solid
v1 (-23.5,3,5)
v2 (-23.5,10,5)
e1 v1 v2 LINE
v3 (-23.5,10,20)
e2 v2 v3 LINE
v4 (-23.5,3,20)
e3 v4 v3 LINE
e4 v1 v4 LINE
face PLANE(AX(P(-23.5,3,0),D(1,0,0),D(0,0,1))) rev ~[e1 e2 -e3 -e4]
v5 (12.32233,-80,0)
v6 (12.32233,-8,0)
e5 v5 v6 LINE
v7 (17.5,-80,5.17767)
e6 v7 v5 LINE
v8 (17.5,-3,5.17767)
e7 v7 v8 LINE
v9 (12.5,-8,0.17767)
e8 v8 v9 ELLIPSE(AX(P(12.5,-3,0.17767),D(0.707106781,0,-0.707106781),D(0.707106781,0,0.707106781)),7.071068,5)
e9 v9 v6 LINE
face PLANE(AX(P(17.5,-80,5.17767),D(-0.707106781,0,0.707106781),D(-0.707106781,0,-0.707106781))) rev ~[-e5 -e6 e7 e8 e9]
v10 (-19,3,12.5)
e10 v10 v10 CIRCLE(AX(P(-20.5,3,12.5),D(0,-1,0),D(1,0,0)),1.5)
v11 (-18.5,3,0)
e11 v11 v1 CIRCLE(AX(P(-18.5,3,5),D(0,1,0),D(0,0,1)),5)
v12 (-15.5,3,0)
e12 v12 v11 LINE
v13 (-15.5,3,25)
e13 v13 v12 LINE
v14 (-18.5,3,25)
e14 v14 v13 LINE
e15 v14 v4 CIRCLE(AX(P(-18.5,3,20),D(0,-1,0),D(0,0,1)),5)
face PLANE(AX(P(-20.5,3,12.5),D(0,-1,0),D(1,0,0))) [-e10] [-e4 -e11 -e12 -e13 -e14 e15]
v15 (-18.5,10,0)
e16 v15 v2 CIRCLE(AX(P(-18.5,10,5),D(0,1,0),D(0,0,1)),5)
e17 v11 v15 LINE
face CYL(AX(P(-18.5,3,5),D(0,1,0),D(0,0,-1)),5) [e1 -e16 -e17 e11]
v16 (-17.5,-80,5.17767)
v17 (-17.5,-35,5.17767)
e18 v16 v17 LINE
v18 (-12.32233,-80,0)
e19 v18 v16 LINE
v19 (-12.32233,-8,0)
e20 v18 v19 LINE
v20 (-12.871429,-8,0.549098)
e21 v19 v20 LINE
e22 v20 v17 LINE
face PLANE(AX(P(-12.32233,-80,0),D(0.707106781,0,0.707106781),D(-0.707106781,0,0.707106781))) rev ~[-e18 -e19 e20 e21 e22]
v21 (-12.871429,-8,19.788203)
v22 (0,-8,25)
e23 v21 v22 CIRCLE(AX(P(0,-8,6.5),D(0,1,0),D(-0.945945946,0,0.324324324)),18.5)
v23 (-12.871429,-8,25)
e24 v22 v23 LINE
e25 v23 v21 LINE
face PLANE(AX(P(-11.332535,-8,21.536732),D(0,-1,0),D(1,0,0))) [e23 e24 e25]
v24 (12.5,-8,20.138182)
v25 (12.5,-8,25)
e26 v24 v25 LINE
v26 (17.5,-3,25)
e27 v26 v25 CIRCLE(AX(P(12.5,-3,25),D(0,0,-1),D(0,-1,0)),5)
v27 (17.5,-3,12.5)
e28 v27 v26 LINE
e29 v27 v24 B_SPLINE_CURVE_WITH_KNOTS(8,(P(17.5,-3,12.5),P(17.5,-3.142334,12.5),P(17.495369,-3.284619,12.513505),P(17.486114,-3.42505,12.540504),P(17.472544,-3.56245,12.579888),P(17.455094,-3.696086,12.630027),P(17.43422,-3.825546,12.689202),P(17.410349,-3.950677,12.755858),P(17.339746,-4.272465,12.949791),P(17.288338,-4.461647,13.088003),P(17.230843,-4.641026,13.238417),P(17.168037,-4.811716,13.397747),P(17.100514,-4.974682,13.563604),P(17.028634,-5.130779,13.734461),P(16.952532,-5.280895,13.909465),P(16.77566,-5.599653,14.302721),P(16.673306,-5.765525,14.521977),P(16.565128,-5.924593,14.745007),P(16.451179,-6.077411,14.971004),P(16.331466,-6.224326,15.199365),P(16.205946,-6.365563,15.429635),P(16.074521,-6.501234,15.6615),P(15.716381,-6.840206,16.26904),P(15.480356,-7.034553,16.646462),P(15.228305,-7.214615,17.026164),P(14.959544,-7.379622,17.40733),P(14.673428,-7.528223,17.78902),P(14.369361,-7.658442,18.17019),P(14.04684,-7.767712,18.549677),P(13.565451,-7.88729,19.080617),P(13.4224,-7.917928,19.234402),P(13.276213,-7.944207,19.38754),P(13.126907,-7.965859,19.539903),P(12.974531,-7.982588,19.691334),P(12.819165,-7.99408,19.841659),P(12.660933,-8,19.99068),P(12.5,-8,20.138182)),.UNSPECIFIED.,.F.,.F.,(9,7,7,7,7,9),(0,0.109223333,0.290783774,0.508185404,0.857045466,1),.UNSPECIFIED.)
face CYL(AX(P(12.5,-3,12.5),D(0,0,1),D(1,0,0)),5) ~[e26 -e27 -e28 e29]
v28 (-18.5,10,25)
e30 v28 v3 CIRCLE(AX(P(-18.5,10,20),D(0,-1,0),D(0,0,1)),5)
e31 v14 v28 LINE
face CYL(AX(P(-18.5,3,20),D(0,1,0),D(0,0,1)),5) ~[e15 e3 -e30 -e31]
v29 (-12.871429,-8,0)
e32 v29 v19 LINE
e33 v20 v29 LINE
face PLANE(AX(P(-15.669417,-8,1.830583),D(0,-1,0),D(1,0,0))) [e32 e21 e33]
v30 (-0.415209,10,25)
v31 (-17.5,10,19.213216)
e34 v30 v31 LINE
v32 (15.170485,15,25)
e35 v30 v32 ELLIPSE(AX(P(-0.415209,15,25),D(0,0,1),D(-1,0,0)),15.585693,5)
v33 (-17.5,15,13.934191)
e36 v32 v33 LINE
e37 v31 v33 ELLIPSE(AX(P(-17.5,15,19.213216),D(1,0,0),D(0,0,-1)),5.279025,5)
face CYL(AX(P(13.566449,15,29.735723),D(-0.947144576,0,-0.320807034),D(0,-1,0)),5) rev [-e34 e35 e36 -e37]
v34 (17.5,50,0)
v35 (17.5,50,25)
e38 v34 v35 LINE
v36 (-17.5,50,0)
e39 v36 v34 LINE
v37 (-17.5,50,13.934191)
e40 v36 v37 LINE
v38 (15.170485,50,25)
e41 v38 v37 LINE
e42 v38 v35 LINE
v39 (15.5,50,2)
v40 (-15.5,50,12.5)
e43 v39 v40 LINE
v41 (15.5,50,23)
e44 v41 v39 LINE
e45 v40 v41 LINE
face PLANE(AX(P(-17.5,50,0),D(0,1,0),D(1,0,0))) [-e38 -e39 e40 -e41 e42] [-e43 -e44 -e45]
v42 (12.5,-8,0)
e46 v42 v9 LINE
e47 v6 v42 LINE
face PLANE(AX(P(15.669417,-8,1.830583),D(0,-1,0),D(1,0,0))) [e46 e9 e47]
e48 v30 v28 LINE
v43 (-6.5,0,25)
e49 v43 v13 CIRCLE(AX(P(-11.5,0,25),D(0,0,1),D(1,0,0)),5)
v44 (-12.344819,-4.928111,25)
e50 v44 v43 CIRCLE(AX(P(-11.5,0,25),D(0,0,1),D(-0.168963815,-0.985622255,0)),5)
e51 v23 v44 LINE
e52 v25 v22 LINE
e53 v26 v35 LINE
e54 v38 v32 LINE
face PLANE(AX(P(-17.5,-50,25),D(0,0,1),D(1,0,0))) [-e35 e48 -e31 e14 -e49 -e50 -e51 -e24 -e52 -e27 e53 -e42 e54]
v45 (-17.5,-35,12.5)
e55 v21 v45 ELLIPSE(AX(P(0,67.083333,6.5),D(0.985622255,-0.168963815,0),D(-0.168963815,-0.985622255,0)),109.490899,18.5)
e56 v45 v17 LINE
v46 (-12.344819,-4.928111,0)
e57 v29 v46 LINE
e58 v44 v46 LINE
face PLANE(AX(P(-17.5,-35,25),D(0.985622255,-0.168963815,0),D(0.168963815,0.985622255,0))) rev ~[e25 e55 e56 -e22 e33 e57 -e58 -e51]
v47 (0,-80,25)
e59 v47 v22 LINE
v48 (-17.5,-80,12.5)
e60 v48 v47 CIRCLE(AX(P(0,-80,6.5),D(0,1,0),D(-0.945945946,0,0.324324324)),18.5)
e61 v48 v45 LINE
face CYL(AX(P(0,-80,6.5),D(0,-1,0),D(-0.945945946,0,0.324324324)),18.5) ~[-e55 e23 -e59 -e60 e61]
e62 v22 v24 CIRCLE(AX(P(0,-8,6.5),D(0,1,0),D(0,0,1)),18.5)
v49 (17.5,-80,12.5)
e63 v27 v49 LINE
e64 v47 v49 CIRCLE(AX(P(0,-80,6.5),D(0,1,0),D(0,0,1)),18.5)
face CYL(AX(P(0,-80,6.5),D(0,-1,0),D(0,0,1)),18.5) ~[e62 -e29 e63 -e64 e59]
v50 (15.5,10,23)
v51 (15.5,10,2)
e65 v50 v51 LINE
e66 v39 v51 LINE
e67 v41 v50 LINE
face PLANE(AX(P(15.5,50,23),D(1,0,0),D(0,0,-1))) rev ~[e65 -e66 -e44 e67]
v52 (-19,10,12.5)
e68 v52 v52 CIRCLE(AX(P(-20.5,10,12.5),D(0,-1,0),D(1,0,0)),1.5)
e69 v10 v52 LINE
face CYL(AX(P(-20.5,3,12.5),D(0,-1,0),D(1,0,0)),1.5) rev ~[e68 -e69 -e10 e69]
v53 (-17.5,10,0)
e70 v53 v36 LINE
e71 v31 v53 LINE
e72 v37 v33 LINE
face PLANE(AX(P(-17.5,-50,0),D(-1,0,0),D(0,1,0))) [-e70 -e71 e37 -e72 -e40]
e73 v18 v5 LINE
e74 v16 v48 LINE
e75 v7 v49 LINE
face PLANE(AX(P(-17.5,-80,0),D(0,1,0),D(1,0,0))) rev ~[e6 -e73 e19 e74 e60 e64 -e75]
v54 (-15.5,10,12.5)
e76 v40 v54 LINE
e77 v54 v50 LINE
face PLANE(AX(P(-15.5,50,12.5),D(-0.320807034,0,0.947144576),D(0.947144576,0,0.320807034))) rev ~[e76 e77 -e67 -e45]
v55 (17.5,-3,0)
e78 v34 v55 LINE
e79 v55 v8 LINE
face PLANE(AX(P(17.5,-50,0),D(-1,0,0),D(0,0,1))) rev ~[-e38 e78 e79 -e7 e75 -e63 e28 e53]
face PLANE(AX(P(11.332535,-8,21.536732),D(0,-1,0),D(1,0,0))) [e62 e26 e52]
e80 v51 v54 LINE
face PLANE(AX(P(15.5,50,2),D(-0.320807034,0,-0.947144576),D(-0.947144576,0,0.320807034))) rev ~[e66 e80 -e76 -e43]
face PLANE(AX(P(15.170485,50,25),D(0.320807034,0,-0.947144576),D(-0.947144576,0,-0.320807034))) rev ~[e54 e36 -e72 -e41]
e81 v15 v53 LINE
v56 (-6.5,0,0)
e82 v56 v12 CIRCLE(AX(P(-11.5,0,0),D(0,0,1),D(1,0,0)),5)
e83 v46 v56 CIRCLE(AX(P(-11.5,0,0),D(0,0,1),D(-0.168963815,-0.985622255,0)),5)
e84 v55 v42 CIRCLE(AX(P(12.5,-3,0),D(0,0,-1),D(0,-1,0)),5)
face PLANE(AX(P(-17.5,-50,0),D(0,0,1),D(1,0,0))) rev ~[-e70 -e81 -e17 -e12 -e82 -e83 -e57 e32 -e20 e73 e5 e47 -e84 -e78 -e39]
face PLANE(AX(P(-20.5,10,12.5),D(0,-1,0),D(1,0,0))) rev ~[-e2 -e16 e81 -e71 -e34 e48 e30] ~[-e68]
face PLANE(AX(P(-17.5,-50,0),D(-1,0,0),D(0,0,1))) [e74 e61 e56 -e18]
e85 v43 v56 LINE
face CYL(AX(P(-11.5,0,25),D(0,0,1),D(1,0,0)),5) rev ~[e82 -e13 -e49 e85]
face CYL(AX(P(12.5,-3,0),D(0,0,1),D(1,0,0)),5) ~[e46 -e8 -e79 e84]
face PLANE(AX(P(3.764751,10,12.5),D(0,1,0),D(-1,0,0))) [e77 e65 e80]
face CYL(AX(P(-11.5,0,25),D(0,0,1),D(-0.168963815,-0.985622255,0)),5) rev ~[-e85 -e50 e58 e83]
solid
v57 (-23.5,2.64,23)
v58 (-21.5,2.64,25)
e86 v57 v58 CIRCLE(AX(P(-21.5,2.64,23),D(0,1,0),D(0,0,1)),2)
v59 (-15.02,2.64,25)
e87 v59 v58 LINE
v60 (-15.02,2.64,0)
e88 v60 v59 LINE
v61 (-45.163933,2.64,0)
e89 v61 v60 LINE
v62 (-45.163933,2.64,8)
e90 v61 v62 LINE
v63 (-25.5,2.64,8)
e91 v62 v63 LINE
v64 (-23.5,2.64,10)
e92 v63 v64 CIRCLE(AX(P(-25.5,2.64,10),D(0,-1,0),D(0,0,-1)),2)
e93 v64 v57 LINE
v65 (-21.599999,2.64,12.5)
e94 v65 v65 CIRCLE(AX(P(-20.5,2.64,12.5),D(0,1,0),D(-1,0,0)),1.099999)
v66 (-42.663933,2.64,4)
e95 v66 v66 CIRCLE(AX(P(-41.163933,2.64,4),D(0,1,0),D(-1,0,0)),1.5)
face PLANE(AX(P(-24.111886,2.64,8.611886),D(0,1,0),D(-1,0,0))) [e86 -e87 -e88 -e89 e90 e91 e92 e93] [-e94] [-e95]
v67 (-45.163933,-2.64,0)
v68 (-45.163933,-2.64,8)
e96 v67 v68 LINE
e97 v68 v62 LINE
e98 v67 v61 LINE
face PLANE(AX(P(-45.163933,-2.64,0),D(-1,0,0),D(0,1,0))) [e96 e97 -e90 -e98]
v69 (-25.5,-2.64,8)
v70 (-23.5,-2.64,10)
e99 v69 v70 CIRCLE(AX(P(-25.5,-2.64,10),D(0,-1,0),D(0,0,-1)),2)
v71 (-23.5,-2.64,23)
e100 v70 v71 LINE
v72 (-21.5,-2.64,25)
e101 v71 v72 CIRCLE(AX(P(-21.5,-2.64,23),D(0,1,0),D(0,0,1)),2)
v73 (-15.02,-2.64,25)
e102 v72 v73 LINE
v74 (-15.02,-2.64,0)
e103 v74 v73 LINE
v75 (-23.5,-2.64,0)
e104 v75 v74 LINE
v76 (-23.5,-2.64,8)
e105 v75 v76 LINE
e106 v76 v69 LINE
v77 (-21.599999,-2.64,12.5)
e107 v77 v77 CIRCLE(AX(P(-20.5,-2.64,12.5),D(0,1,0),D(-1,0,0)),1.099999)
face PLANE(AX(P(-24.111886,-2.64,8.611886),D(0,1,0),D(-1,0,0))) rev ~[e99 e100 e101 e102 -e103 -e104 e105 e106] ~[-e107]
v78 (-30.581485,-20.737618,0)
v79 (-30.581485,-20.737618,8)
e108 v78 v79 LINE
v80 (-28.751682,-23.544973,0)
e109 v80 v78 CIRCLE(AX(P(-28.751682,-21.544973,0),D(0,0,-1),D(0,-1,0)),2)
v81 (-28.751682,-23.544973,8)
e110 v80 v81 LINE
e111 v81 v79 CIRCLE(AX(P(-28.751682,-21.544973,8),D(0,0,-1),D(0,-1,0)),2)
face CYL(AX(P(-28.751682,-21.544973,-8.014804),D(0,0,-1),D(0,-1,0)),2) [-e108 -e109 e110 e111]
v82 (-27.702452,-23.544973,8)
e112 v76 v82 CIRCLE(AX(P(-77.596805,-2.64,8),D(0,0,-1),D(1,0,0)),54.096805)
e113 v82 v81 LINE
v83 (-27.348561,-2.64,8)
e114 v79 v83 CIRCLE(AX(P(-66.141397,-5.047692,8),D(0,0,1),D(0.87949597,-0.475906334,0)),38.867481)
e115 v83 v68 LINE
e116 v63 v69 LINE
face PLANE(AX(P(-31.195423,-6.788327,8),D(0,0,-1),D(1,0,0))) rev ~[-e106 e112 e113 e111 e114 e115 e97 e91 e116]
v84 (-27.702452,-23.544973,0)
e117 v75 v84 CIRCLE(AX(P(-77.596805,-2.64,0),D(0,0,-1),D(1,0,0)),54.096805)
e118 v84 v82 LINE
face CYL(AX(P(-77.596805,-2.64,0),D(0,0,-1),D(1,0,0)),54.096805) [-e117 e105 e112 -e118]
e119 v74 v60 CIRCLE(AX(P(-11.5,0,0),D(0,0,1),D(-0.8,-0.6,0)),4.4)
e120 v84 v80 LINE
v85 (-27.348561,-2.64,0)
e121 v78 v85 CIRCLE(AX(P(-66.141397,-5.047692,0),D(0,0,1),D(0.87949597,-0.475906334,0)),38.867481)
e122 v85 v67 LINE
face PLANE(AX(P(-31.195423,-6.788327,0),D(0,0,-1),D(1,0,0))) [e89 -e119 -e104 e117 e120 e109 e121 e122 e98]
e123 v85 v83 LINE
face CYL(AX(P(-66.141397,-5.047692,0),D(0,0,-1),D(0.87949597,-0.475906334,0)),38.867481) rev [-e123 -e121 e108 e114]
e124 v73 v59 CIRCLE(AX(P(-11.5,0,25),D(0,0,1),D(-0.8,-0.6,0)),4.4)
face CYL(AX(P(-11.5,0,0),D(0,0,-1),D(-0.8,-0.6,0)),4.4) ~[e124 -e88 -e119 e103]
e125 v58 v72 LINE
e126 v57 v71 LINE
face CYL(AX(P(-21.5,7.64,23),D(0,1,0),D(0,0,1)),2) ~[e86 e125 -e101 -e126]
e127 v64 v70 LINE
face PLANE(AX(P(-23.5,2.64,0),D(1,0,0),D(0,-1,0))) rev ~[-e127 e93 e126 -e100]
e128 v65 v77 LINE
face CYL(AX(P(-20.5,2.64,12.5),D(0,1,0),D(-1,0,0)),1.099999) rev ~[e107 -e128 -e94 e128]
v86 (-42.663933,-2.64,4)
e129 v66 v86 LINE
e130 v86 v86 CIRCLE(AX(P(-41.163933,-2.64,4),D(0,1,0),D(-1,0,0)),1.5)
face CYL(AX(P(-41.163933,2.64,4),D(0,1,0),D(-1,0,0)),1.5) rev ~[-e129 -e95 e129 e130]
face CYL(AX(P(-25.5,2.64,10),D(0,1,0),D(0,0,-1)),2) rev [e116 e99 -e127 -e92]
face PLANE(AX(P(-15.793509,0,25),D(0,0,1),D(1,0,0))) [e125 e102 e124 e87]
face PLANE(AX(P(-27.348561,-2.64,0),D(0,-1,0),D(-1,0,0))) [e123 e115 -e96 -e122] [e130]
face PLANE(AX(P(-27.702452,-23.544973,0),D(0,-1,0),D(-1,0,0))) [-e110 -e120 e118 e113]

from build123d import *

# Parameters (mm, degrees)
F0_W         = 35
F0_H         = 100
F1_DEPTH     = 25
F3_DEPTH     = 40
F5_DEPTH     = 25.001
F6_W         = 6
F6_H         = 25
F6_R         = 1.5
F7_DEPTH     = 7
F9_DEPTH     = 25
F10_R        = 1.0999994278
F11_DEPTH    = 52.641
F13_DEPTH    = 8
F14_T1_DEPTH = 5.28
F14_T3_DEPTH = 24.0296074828
F14_T5_DEPTH = 15.28
F15_DEPTH    = 30
F17_DEPTH    = 72
F18_R        = 5
F19_R        = 1.5
F20_DEPTH    = 82.6410001


# Not quite as in the source:
# - a fillet or chamfer that OpenCascade refuses, or shapes differently, is made with other operations: its cross-section is extruded or revolved along the edge and cut away or added


with BuildPart() as f1:
    # F0 (on Top) → F1 (new body)
    with BuildSketch(Plane.XY):
        Rectangle(F0_W, F0_H)
    extrude(amount=F1_DEPTH)

    # F2 (on face) → F3 (cut)
    with BuildSketch(Plane(origin=(0, 50, 0), x_dir=(-1, 0, 0), z_dir=(0, 1, 0))):
        Polygon((15.5, 12.5), (-15.5, 23), (-15.5, 2), align=None)
        Polygon((17.5, 25), (-15.1704846289, 25), (17.5, 13.9341906902), align=None)
    extrude(amount=-F3_DEPTH, mode=Mode.SUBTRACT)

    # F4 (on face) → F5 (cut, through all)
    with BuildSketch(Plane.XY.offset(25)):
        with BuildLine():
            ThreePointArc((-12.3448190756, -4.9281112741), (-8.2769653568, -3.822570822), (-6.5, 0))
            ThreePointArc((-6.5, 0), (-9.9188611699, 4.7434164903), (-15.5, 3))
            Line((-15.5, 3), (-15.5, -3))
            ThreePointArc((-15.5, -3), (-14.1071960494, -4.2664421665), (-12.3448190756, -4.9281112741))
        make_face()
        with BuildLine():
            Line((-15.5, -3), (-15.5, 3))
            ThreePointArc((-15.5, 3), (-16.5, 0), (-15.5, -3))
        make_face()
        with BuildLine():
            ThreePointArc((-15.5, -3), (-16.5, 0), (-15.5, 3))
            Line((-15.5, 3), (-19.5, 3))
            Line((-19.5, 3), (-19.5, -3))
            Line((-19.5, -3), (-17.5, -3))
            Line((-17.5, -3), (-15.5, -3))
        make_face()
        with BuildLine():
            Line((-17.5, -35), (-12.3448190756, -4.9281112741))
            ThreePointArc((-12.3448190756, -4.9281112741), (-14.1071960494, -4.2664421665), (-15.5, -3))
            Line((-15.5, -3), (-17.5, -3))
            Line((-17.5, -3), (-17.5, -35))
        make_face()
    extrude(amount=-F5_DEPTH, mode=Mode.SUBTRACT)

    # F6 (on face) → F7 (join, through all)
    with BuildSketch(Plane.XZ.offset(-3)):
        with Locations((-20.5, 12.5)):
            Rectangle(F6_W, F6_H)
        with Locations((-20.5, 12.5)):
            Circle(F6_R, mode=Mode.SUBTRACT)
    extrude(amount=-F7_DEPTH)

    # F15 (add): a face of the model
    f15_faces = [f1.faces().sort_by_distance(p)[0] for p in [
        (0, -50, 12.5),
    ]]
    extrude(f15_faces, amount=F15_DEPTH)

    # F16 (on face) → F17 (cut)
    with BuildSketch(Plane.XZ.offset(80)):
        with BuildLine():
            ThreePointArc((0, 25), (10.7529065838, 21.5540692173), (17.5, 12.5))
            Line((17.5, 12.5), (17.5, 25))
            Line((17.5, 25), (0, 25))
        make_face()
        with BuildLine():
            ThreePointArc((-17.5, 12.5), (-10.7529065838, 21.5540692173), (0, 25))
            Line((0, 25), (-17.5, 25))
            Line((-17.5, 25), (-17.5, 12.5))
        make_face()
        Polygon((-12.3223304703, 0), (-17.5, 5.1776695297), (-17.5, 0), align=None)
        Polygon((17.5, 0), (17.5, 5.1776695297), (12.3223304703, 0), align=None)
    extrude(amount=-F17_DEPTH, mode=Mode.SUBTRACT)

    # F18
    f18_edges = [f1.edges().sort_by_distance(p)[0] for p in [
        (17.5, -8, 18.75),
        (17.5, -8, 2.588835),
        (-1.164758, 10, 19.467095),
        (-23.5, 6.5, 0),
        (-23.5, 6.5, 25),
    ]]
    fillet(f18_edges, radius=F18_R)


with BuildPart() as f9:
    # F8 (on Top) → F9 (new body, through all)
    with BuildSketch(Plane.XY):
        with BuildLine():
            Line((-23.5, -2.64), (-15.02, -2.64))
            ThreePointArc((-15.02, -2.64), (-7.1, 0), (-15.02, 2.64))
            Line((-15.02, 2.64), (-23.5, 2.64))
            Line((-23.5, 2.64), (-23.5, -2.64))
        make_face()
    extrude(amount=F9_DEPTH)

    # F10 (on face) → F11 (cut, through all)
    with BuildSketch(Plane(origin=(0, 2.64, 0), x_dir=(-1, 0, 0), z_dir=(0, 1, 0))):
        with Locations((20.5, 12.5)):
            Circle(F10_R)
    extrude(amount=-F11_DEPTH, mode=Mode.SUBTRACT)

    # F12 (on face) → F13 (join)
    with BuildSketch(Plane(origin=(0, 0, 0), x_dir=(1, 0, 0), z_dir=(0, 0, -1))):
        with BuildLine():
            ThreePointArc((-23.5, 2.64), (-24.5610181297, 13.3015957041), (-27.7024523358, 23.5449727625))
            Line((-27.7024523358, 23.5449727625), (-31.957603991, 23.5449727625))
            ThreePointArc((-31.957603991, 23.5449727625), (-28.1854810092, 13.4160571698), (-27.3485612124, 2.64))
            Line((-27.3485612124, 2.64), (-45.1639331877, 2.64))
            Line((-45.1639331877, 2.64), (-45.1639331877, -2.64))
            Line((-45.1639331877, -2.64), (-23.5, -2.64))
            Line((-23.5, -2.64), (-23.5, 2.64))
        make_face()
    extrude(amount=-F13_DEPTH)

    # F14: fillet of radius 2 on 3 edges, made by hand

    # F14_s2 → F14_t1 (join)
    with BuildSketch(Plane.XZ.offset(-2.64)):
        with BuildLine():
            ThreePointArc((-25.5, 8), (-24.0857864376, 8.5857864376), (-23.5, 10))
            Line((-23.5, 10), (-23.5, 8))
            Line((-23.5, 8), (-25.5, 8))
        make_face()
    extrude(amount=F14_T1_DEPTH)

    # F14_s4 → F14_t3 (cut)
    with BuildSketch(Plane.XY.offset(-8.0148037414)):
        with BuildLine():
            ThreePointArc((-28.7516824945, -23.5449727625), (-30.4271988015, -22.6370556829), (-30.5814852362, -20.7376178675))
            ThreePointArc((-30.5814852362, -20.7376178675), (-31.2413053207, -22.1551377475), (-31.957603991, -23.5449727625))
            Line((-31.957603991, -23.5449727625), (-28.7516824945, -23.5449727625))
        make_face()
    extrude(amount=F14_T3_DEPTH, mode=Mode.SUBTRACT)

    # F14_s6 → F14_t5 (cut)
    with BuildSketch(Plane.XZ.offset(-7.64)):
        with BuildLine():
            ThreePointArc((-21.5, 25), (-22.9142135624, 24.4142135624), (-23.5, 23))
            Line((-23.5, 23), (-23.5, 25))
            Line((-23.5, 25), (-21.5, 25))
        make_face()
    extrude(amount=F14_T5_DEPTH, mode=Mode.SUBTRACT)

    # F19 (on face) → F20 (cut, through all)
    with BuildSketch(Plane(origin=(0, 2.64, 0), x_dir=(-1, 0, 0), z_dir=(0, 1, 0))):
        with Locations((41.1639331877, 4)):
            Circle(F19_R)
    extrude(amount=-F20_DEPTH, mode=Mode.SUBTRACT)


solid = Compound([f1.part, f9.part])
